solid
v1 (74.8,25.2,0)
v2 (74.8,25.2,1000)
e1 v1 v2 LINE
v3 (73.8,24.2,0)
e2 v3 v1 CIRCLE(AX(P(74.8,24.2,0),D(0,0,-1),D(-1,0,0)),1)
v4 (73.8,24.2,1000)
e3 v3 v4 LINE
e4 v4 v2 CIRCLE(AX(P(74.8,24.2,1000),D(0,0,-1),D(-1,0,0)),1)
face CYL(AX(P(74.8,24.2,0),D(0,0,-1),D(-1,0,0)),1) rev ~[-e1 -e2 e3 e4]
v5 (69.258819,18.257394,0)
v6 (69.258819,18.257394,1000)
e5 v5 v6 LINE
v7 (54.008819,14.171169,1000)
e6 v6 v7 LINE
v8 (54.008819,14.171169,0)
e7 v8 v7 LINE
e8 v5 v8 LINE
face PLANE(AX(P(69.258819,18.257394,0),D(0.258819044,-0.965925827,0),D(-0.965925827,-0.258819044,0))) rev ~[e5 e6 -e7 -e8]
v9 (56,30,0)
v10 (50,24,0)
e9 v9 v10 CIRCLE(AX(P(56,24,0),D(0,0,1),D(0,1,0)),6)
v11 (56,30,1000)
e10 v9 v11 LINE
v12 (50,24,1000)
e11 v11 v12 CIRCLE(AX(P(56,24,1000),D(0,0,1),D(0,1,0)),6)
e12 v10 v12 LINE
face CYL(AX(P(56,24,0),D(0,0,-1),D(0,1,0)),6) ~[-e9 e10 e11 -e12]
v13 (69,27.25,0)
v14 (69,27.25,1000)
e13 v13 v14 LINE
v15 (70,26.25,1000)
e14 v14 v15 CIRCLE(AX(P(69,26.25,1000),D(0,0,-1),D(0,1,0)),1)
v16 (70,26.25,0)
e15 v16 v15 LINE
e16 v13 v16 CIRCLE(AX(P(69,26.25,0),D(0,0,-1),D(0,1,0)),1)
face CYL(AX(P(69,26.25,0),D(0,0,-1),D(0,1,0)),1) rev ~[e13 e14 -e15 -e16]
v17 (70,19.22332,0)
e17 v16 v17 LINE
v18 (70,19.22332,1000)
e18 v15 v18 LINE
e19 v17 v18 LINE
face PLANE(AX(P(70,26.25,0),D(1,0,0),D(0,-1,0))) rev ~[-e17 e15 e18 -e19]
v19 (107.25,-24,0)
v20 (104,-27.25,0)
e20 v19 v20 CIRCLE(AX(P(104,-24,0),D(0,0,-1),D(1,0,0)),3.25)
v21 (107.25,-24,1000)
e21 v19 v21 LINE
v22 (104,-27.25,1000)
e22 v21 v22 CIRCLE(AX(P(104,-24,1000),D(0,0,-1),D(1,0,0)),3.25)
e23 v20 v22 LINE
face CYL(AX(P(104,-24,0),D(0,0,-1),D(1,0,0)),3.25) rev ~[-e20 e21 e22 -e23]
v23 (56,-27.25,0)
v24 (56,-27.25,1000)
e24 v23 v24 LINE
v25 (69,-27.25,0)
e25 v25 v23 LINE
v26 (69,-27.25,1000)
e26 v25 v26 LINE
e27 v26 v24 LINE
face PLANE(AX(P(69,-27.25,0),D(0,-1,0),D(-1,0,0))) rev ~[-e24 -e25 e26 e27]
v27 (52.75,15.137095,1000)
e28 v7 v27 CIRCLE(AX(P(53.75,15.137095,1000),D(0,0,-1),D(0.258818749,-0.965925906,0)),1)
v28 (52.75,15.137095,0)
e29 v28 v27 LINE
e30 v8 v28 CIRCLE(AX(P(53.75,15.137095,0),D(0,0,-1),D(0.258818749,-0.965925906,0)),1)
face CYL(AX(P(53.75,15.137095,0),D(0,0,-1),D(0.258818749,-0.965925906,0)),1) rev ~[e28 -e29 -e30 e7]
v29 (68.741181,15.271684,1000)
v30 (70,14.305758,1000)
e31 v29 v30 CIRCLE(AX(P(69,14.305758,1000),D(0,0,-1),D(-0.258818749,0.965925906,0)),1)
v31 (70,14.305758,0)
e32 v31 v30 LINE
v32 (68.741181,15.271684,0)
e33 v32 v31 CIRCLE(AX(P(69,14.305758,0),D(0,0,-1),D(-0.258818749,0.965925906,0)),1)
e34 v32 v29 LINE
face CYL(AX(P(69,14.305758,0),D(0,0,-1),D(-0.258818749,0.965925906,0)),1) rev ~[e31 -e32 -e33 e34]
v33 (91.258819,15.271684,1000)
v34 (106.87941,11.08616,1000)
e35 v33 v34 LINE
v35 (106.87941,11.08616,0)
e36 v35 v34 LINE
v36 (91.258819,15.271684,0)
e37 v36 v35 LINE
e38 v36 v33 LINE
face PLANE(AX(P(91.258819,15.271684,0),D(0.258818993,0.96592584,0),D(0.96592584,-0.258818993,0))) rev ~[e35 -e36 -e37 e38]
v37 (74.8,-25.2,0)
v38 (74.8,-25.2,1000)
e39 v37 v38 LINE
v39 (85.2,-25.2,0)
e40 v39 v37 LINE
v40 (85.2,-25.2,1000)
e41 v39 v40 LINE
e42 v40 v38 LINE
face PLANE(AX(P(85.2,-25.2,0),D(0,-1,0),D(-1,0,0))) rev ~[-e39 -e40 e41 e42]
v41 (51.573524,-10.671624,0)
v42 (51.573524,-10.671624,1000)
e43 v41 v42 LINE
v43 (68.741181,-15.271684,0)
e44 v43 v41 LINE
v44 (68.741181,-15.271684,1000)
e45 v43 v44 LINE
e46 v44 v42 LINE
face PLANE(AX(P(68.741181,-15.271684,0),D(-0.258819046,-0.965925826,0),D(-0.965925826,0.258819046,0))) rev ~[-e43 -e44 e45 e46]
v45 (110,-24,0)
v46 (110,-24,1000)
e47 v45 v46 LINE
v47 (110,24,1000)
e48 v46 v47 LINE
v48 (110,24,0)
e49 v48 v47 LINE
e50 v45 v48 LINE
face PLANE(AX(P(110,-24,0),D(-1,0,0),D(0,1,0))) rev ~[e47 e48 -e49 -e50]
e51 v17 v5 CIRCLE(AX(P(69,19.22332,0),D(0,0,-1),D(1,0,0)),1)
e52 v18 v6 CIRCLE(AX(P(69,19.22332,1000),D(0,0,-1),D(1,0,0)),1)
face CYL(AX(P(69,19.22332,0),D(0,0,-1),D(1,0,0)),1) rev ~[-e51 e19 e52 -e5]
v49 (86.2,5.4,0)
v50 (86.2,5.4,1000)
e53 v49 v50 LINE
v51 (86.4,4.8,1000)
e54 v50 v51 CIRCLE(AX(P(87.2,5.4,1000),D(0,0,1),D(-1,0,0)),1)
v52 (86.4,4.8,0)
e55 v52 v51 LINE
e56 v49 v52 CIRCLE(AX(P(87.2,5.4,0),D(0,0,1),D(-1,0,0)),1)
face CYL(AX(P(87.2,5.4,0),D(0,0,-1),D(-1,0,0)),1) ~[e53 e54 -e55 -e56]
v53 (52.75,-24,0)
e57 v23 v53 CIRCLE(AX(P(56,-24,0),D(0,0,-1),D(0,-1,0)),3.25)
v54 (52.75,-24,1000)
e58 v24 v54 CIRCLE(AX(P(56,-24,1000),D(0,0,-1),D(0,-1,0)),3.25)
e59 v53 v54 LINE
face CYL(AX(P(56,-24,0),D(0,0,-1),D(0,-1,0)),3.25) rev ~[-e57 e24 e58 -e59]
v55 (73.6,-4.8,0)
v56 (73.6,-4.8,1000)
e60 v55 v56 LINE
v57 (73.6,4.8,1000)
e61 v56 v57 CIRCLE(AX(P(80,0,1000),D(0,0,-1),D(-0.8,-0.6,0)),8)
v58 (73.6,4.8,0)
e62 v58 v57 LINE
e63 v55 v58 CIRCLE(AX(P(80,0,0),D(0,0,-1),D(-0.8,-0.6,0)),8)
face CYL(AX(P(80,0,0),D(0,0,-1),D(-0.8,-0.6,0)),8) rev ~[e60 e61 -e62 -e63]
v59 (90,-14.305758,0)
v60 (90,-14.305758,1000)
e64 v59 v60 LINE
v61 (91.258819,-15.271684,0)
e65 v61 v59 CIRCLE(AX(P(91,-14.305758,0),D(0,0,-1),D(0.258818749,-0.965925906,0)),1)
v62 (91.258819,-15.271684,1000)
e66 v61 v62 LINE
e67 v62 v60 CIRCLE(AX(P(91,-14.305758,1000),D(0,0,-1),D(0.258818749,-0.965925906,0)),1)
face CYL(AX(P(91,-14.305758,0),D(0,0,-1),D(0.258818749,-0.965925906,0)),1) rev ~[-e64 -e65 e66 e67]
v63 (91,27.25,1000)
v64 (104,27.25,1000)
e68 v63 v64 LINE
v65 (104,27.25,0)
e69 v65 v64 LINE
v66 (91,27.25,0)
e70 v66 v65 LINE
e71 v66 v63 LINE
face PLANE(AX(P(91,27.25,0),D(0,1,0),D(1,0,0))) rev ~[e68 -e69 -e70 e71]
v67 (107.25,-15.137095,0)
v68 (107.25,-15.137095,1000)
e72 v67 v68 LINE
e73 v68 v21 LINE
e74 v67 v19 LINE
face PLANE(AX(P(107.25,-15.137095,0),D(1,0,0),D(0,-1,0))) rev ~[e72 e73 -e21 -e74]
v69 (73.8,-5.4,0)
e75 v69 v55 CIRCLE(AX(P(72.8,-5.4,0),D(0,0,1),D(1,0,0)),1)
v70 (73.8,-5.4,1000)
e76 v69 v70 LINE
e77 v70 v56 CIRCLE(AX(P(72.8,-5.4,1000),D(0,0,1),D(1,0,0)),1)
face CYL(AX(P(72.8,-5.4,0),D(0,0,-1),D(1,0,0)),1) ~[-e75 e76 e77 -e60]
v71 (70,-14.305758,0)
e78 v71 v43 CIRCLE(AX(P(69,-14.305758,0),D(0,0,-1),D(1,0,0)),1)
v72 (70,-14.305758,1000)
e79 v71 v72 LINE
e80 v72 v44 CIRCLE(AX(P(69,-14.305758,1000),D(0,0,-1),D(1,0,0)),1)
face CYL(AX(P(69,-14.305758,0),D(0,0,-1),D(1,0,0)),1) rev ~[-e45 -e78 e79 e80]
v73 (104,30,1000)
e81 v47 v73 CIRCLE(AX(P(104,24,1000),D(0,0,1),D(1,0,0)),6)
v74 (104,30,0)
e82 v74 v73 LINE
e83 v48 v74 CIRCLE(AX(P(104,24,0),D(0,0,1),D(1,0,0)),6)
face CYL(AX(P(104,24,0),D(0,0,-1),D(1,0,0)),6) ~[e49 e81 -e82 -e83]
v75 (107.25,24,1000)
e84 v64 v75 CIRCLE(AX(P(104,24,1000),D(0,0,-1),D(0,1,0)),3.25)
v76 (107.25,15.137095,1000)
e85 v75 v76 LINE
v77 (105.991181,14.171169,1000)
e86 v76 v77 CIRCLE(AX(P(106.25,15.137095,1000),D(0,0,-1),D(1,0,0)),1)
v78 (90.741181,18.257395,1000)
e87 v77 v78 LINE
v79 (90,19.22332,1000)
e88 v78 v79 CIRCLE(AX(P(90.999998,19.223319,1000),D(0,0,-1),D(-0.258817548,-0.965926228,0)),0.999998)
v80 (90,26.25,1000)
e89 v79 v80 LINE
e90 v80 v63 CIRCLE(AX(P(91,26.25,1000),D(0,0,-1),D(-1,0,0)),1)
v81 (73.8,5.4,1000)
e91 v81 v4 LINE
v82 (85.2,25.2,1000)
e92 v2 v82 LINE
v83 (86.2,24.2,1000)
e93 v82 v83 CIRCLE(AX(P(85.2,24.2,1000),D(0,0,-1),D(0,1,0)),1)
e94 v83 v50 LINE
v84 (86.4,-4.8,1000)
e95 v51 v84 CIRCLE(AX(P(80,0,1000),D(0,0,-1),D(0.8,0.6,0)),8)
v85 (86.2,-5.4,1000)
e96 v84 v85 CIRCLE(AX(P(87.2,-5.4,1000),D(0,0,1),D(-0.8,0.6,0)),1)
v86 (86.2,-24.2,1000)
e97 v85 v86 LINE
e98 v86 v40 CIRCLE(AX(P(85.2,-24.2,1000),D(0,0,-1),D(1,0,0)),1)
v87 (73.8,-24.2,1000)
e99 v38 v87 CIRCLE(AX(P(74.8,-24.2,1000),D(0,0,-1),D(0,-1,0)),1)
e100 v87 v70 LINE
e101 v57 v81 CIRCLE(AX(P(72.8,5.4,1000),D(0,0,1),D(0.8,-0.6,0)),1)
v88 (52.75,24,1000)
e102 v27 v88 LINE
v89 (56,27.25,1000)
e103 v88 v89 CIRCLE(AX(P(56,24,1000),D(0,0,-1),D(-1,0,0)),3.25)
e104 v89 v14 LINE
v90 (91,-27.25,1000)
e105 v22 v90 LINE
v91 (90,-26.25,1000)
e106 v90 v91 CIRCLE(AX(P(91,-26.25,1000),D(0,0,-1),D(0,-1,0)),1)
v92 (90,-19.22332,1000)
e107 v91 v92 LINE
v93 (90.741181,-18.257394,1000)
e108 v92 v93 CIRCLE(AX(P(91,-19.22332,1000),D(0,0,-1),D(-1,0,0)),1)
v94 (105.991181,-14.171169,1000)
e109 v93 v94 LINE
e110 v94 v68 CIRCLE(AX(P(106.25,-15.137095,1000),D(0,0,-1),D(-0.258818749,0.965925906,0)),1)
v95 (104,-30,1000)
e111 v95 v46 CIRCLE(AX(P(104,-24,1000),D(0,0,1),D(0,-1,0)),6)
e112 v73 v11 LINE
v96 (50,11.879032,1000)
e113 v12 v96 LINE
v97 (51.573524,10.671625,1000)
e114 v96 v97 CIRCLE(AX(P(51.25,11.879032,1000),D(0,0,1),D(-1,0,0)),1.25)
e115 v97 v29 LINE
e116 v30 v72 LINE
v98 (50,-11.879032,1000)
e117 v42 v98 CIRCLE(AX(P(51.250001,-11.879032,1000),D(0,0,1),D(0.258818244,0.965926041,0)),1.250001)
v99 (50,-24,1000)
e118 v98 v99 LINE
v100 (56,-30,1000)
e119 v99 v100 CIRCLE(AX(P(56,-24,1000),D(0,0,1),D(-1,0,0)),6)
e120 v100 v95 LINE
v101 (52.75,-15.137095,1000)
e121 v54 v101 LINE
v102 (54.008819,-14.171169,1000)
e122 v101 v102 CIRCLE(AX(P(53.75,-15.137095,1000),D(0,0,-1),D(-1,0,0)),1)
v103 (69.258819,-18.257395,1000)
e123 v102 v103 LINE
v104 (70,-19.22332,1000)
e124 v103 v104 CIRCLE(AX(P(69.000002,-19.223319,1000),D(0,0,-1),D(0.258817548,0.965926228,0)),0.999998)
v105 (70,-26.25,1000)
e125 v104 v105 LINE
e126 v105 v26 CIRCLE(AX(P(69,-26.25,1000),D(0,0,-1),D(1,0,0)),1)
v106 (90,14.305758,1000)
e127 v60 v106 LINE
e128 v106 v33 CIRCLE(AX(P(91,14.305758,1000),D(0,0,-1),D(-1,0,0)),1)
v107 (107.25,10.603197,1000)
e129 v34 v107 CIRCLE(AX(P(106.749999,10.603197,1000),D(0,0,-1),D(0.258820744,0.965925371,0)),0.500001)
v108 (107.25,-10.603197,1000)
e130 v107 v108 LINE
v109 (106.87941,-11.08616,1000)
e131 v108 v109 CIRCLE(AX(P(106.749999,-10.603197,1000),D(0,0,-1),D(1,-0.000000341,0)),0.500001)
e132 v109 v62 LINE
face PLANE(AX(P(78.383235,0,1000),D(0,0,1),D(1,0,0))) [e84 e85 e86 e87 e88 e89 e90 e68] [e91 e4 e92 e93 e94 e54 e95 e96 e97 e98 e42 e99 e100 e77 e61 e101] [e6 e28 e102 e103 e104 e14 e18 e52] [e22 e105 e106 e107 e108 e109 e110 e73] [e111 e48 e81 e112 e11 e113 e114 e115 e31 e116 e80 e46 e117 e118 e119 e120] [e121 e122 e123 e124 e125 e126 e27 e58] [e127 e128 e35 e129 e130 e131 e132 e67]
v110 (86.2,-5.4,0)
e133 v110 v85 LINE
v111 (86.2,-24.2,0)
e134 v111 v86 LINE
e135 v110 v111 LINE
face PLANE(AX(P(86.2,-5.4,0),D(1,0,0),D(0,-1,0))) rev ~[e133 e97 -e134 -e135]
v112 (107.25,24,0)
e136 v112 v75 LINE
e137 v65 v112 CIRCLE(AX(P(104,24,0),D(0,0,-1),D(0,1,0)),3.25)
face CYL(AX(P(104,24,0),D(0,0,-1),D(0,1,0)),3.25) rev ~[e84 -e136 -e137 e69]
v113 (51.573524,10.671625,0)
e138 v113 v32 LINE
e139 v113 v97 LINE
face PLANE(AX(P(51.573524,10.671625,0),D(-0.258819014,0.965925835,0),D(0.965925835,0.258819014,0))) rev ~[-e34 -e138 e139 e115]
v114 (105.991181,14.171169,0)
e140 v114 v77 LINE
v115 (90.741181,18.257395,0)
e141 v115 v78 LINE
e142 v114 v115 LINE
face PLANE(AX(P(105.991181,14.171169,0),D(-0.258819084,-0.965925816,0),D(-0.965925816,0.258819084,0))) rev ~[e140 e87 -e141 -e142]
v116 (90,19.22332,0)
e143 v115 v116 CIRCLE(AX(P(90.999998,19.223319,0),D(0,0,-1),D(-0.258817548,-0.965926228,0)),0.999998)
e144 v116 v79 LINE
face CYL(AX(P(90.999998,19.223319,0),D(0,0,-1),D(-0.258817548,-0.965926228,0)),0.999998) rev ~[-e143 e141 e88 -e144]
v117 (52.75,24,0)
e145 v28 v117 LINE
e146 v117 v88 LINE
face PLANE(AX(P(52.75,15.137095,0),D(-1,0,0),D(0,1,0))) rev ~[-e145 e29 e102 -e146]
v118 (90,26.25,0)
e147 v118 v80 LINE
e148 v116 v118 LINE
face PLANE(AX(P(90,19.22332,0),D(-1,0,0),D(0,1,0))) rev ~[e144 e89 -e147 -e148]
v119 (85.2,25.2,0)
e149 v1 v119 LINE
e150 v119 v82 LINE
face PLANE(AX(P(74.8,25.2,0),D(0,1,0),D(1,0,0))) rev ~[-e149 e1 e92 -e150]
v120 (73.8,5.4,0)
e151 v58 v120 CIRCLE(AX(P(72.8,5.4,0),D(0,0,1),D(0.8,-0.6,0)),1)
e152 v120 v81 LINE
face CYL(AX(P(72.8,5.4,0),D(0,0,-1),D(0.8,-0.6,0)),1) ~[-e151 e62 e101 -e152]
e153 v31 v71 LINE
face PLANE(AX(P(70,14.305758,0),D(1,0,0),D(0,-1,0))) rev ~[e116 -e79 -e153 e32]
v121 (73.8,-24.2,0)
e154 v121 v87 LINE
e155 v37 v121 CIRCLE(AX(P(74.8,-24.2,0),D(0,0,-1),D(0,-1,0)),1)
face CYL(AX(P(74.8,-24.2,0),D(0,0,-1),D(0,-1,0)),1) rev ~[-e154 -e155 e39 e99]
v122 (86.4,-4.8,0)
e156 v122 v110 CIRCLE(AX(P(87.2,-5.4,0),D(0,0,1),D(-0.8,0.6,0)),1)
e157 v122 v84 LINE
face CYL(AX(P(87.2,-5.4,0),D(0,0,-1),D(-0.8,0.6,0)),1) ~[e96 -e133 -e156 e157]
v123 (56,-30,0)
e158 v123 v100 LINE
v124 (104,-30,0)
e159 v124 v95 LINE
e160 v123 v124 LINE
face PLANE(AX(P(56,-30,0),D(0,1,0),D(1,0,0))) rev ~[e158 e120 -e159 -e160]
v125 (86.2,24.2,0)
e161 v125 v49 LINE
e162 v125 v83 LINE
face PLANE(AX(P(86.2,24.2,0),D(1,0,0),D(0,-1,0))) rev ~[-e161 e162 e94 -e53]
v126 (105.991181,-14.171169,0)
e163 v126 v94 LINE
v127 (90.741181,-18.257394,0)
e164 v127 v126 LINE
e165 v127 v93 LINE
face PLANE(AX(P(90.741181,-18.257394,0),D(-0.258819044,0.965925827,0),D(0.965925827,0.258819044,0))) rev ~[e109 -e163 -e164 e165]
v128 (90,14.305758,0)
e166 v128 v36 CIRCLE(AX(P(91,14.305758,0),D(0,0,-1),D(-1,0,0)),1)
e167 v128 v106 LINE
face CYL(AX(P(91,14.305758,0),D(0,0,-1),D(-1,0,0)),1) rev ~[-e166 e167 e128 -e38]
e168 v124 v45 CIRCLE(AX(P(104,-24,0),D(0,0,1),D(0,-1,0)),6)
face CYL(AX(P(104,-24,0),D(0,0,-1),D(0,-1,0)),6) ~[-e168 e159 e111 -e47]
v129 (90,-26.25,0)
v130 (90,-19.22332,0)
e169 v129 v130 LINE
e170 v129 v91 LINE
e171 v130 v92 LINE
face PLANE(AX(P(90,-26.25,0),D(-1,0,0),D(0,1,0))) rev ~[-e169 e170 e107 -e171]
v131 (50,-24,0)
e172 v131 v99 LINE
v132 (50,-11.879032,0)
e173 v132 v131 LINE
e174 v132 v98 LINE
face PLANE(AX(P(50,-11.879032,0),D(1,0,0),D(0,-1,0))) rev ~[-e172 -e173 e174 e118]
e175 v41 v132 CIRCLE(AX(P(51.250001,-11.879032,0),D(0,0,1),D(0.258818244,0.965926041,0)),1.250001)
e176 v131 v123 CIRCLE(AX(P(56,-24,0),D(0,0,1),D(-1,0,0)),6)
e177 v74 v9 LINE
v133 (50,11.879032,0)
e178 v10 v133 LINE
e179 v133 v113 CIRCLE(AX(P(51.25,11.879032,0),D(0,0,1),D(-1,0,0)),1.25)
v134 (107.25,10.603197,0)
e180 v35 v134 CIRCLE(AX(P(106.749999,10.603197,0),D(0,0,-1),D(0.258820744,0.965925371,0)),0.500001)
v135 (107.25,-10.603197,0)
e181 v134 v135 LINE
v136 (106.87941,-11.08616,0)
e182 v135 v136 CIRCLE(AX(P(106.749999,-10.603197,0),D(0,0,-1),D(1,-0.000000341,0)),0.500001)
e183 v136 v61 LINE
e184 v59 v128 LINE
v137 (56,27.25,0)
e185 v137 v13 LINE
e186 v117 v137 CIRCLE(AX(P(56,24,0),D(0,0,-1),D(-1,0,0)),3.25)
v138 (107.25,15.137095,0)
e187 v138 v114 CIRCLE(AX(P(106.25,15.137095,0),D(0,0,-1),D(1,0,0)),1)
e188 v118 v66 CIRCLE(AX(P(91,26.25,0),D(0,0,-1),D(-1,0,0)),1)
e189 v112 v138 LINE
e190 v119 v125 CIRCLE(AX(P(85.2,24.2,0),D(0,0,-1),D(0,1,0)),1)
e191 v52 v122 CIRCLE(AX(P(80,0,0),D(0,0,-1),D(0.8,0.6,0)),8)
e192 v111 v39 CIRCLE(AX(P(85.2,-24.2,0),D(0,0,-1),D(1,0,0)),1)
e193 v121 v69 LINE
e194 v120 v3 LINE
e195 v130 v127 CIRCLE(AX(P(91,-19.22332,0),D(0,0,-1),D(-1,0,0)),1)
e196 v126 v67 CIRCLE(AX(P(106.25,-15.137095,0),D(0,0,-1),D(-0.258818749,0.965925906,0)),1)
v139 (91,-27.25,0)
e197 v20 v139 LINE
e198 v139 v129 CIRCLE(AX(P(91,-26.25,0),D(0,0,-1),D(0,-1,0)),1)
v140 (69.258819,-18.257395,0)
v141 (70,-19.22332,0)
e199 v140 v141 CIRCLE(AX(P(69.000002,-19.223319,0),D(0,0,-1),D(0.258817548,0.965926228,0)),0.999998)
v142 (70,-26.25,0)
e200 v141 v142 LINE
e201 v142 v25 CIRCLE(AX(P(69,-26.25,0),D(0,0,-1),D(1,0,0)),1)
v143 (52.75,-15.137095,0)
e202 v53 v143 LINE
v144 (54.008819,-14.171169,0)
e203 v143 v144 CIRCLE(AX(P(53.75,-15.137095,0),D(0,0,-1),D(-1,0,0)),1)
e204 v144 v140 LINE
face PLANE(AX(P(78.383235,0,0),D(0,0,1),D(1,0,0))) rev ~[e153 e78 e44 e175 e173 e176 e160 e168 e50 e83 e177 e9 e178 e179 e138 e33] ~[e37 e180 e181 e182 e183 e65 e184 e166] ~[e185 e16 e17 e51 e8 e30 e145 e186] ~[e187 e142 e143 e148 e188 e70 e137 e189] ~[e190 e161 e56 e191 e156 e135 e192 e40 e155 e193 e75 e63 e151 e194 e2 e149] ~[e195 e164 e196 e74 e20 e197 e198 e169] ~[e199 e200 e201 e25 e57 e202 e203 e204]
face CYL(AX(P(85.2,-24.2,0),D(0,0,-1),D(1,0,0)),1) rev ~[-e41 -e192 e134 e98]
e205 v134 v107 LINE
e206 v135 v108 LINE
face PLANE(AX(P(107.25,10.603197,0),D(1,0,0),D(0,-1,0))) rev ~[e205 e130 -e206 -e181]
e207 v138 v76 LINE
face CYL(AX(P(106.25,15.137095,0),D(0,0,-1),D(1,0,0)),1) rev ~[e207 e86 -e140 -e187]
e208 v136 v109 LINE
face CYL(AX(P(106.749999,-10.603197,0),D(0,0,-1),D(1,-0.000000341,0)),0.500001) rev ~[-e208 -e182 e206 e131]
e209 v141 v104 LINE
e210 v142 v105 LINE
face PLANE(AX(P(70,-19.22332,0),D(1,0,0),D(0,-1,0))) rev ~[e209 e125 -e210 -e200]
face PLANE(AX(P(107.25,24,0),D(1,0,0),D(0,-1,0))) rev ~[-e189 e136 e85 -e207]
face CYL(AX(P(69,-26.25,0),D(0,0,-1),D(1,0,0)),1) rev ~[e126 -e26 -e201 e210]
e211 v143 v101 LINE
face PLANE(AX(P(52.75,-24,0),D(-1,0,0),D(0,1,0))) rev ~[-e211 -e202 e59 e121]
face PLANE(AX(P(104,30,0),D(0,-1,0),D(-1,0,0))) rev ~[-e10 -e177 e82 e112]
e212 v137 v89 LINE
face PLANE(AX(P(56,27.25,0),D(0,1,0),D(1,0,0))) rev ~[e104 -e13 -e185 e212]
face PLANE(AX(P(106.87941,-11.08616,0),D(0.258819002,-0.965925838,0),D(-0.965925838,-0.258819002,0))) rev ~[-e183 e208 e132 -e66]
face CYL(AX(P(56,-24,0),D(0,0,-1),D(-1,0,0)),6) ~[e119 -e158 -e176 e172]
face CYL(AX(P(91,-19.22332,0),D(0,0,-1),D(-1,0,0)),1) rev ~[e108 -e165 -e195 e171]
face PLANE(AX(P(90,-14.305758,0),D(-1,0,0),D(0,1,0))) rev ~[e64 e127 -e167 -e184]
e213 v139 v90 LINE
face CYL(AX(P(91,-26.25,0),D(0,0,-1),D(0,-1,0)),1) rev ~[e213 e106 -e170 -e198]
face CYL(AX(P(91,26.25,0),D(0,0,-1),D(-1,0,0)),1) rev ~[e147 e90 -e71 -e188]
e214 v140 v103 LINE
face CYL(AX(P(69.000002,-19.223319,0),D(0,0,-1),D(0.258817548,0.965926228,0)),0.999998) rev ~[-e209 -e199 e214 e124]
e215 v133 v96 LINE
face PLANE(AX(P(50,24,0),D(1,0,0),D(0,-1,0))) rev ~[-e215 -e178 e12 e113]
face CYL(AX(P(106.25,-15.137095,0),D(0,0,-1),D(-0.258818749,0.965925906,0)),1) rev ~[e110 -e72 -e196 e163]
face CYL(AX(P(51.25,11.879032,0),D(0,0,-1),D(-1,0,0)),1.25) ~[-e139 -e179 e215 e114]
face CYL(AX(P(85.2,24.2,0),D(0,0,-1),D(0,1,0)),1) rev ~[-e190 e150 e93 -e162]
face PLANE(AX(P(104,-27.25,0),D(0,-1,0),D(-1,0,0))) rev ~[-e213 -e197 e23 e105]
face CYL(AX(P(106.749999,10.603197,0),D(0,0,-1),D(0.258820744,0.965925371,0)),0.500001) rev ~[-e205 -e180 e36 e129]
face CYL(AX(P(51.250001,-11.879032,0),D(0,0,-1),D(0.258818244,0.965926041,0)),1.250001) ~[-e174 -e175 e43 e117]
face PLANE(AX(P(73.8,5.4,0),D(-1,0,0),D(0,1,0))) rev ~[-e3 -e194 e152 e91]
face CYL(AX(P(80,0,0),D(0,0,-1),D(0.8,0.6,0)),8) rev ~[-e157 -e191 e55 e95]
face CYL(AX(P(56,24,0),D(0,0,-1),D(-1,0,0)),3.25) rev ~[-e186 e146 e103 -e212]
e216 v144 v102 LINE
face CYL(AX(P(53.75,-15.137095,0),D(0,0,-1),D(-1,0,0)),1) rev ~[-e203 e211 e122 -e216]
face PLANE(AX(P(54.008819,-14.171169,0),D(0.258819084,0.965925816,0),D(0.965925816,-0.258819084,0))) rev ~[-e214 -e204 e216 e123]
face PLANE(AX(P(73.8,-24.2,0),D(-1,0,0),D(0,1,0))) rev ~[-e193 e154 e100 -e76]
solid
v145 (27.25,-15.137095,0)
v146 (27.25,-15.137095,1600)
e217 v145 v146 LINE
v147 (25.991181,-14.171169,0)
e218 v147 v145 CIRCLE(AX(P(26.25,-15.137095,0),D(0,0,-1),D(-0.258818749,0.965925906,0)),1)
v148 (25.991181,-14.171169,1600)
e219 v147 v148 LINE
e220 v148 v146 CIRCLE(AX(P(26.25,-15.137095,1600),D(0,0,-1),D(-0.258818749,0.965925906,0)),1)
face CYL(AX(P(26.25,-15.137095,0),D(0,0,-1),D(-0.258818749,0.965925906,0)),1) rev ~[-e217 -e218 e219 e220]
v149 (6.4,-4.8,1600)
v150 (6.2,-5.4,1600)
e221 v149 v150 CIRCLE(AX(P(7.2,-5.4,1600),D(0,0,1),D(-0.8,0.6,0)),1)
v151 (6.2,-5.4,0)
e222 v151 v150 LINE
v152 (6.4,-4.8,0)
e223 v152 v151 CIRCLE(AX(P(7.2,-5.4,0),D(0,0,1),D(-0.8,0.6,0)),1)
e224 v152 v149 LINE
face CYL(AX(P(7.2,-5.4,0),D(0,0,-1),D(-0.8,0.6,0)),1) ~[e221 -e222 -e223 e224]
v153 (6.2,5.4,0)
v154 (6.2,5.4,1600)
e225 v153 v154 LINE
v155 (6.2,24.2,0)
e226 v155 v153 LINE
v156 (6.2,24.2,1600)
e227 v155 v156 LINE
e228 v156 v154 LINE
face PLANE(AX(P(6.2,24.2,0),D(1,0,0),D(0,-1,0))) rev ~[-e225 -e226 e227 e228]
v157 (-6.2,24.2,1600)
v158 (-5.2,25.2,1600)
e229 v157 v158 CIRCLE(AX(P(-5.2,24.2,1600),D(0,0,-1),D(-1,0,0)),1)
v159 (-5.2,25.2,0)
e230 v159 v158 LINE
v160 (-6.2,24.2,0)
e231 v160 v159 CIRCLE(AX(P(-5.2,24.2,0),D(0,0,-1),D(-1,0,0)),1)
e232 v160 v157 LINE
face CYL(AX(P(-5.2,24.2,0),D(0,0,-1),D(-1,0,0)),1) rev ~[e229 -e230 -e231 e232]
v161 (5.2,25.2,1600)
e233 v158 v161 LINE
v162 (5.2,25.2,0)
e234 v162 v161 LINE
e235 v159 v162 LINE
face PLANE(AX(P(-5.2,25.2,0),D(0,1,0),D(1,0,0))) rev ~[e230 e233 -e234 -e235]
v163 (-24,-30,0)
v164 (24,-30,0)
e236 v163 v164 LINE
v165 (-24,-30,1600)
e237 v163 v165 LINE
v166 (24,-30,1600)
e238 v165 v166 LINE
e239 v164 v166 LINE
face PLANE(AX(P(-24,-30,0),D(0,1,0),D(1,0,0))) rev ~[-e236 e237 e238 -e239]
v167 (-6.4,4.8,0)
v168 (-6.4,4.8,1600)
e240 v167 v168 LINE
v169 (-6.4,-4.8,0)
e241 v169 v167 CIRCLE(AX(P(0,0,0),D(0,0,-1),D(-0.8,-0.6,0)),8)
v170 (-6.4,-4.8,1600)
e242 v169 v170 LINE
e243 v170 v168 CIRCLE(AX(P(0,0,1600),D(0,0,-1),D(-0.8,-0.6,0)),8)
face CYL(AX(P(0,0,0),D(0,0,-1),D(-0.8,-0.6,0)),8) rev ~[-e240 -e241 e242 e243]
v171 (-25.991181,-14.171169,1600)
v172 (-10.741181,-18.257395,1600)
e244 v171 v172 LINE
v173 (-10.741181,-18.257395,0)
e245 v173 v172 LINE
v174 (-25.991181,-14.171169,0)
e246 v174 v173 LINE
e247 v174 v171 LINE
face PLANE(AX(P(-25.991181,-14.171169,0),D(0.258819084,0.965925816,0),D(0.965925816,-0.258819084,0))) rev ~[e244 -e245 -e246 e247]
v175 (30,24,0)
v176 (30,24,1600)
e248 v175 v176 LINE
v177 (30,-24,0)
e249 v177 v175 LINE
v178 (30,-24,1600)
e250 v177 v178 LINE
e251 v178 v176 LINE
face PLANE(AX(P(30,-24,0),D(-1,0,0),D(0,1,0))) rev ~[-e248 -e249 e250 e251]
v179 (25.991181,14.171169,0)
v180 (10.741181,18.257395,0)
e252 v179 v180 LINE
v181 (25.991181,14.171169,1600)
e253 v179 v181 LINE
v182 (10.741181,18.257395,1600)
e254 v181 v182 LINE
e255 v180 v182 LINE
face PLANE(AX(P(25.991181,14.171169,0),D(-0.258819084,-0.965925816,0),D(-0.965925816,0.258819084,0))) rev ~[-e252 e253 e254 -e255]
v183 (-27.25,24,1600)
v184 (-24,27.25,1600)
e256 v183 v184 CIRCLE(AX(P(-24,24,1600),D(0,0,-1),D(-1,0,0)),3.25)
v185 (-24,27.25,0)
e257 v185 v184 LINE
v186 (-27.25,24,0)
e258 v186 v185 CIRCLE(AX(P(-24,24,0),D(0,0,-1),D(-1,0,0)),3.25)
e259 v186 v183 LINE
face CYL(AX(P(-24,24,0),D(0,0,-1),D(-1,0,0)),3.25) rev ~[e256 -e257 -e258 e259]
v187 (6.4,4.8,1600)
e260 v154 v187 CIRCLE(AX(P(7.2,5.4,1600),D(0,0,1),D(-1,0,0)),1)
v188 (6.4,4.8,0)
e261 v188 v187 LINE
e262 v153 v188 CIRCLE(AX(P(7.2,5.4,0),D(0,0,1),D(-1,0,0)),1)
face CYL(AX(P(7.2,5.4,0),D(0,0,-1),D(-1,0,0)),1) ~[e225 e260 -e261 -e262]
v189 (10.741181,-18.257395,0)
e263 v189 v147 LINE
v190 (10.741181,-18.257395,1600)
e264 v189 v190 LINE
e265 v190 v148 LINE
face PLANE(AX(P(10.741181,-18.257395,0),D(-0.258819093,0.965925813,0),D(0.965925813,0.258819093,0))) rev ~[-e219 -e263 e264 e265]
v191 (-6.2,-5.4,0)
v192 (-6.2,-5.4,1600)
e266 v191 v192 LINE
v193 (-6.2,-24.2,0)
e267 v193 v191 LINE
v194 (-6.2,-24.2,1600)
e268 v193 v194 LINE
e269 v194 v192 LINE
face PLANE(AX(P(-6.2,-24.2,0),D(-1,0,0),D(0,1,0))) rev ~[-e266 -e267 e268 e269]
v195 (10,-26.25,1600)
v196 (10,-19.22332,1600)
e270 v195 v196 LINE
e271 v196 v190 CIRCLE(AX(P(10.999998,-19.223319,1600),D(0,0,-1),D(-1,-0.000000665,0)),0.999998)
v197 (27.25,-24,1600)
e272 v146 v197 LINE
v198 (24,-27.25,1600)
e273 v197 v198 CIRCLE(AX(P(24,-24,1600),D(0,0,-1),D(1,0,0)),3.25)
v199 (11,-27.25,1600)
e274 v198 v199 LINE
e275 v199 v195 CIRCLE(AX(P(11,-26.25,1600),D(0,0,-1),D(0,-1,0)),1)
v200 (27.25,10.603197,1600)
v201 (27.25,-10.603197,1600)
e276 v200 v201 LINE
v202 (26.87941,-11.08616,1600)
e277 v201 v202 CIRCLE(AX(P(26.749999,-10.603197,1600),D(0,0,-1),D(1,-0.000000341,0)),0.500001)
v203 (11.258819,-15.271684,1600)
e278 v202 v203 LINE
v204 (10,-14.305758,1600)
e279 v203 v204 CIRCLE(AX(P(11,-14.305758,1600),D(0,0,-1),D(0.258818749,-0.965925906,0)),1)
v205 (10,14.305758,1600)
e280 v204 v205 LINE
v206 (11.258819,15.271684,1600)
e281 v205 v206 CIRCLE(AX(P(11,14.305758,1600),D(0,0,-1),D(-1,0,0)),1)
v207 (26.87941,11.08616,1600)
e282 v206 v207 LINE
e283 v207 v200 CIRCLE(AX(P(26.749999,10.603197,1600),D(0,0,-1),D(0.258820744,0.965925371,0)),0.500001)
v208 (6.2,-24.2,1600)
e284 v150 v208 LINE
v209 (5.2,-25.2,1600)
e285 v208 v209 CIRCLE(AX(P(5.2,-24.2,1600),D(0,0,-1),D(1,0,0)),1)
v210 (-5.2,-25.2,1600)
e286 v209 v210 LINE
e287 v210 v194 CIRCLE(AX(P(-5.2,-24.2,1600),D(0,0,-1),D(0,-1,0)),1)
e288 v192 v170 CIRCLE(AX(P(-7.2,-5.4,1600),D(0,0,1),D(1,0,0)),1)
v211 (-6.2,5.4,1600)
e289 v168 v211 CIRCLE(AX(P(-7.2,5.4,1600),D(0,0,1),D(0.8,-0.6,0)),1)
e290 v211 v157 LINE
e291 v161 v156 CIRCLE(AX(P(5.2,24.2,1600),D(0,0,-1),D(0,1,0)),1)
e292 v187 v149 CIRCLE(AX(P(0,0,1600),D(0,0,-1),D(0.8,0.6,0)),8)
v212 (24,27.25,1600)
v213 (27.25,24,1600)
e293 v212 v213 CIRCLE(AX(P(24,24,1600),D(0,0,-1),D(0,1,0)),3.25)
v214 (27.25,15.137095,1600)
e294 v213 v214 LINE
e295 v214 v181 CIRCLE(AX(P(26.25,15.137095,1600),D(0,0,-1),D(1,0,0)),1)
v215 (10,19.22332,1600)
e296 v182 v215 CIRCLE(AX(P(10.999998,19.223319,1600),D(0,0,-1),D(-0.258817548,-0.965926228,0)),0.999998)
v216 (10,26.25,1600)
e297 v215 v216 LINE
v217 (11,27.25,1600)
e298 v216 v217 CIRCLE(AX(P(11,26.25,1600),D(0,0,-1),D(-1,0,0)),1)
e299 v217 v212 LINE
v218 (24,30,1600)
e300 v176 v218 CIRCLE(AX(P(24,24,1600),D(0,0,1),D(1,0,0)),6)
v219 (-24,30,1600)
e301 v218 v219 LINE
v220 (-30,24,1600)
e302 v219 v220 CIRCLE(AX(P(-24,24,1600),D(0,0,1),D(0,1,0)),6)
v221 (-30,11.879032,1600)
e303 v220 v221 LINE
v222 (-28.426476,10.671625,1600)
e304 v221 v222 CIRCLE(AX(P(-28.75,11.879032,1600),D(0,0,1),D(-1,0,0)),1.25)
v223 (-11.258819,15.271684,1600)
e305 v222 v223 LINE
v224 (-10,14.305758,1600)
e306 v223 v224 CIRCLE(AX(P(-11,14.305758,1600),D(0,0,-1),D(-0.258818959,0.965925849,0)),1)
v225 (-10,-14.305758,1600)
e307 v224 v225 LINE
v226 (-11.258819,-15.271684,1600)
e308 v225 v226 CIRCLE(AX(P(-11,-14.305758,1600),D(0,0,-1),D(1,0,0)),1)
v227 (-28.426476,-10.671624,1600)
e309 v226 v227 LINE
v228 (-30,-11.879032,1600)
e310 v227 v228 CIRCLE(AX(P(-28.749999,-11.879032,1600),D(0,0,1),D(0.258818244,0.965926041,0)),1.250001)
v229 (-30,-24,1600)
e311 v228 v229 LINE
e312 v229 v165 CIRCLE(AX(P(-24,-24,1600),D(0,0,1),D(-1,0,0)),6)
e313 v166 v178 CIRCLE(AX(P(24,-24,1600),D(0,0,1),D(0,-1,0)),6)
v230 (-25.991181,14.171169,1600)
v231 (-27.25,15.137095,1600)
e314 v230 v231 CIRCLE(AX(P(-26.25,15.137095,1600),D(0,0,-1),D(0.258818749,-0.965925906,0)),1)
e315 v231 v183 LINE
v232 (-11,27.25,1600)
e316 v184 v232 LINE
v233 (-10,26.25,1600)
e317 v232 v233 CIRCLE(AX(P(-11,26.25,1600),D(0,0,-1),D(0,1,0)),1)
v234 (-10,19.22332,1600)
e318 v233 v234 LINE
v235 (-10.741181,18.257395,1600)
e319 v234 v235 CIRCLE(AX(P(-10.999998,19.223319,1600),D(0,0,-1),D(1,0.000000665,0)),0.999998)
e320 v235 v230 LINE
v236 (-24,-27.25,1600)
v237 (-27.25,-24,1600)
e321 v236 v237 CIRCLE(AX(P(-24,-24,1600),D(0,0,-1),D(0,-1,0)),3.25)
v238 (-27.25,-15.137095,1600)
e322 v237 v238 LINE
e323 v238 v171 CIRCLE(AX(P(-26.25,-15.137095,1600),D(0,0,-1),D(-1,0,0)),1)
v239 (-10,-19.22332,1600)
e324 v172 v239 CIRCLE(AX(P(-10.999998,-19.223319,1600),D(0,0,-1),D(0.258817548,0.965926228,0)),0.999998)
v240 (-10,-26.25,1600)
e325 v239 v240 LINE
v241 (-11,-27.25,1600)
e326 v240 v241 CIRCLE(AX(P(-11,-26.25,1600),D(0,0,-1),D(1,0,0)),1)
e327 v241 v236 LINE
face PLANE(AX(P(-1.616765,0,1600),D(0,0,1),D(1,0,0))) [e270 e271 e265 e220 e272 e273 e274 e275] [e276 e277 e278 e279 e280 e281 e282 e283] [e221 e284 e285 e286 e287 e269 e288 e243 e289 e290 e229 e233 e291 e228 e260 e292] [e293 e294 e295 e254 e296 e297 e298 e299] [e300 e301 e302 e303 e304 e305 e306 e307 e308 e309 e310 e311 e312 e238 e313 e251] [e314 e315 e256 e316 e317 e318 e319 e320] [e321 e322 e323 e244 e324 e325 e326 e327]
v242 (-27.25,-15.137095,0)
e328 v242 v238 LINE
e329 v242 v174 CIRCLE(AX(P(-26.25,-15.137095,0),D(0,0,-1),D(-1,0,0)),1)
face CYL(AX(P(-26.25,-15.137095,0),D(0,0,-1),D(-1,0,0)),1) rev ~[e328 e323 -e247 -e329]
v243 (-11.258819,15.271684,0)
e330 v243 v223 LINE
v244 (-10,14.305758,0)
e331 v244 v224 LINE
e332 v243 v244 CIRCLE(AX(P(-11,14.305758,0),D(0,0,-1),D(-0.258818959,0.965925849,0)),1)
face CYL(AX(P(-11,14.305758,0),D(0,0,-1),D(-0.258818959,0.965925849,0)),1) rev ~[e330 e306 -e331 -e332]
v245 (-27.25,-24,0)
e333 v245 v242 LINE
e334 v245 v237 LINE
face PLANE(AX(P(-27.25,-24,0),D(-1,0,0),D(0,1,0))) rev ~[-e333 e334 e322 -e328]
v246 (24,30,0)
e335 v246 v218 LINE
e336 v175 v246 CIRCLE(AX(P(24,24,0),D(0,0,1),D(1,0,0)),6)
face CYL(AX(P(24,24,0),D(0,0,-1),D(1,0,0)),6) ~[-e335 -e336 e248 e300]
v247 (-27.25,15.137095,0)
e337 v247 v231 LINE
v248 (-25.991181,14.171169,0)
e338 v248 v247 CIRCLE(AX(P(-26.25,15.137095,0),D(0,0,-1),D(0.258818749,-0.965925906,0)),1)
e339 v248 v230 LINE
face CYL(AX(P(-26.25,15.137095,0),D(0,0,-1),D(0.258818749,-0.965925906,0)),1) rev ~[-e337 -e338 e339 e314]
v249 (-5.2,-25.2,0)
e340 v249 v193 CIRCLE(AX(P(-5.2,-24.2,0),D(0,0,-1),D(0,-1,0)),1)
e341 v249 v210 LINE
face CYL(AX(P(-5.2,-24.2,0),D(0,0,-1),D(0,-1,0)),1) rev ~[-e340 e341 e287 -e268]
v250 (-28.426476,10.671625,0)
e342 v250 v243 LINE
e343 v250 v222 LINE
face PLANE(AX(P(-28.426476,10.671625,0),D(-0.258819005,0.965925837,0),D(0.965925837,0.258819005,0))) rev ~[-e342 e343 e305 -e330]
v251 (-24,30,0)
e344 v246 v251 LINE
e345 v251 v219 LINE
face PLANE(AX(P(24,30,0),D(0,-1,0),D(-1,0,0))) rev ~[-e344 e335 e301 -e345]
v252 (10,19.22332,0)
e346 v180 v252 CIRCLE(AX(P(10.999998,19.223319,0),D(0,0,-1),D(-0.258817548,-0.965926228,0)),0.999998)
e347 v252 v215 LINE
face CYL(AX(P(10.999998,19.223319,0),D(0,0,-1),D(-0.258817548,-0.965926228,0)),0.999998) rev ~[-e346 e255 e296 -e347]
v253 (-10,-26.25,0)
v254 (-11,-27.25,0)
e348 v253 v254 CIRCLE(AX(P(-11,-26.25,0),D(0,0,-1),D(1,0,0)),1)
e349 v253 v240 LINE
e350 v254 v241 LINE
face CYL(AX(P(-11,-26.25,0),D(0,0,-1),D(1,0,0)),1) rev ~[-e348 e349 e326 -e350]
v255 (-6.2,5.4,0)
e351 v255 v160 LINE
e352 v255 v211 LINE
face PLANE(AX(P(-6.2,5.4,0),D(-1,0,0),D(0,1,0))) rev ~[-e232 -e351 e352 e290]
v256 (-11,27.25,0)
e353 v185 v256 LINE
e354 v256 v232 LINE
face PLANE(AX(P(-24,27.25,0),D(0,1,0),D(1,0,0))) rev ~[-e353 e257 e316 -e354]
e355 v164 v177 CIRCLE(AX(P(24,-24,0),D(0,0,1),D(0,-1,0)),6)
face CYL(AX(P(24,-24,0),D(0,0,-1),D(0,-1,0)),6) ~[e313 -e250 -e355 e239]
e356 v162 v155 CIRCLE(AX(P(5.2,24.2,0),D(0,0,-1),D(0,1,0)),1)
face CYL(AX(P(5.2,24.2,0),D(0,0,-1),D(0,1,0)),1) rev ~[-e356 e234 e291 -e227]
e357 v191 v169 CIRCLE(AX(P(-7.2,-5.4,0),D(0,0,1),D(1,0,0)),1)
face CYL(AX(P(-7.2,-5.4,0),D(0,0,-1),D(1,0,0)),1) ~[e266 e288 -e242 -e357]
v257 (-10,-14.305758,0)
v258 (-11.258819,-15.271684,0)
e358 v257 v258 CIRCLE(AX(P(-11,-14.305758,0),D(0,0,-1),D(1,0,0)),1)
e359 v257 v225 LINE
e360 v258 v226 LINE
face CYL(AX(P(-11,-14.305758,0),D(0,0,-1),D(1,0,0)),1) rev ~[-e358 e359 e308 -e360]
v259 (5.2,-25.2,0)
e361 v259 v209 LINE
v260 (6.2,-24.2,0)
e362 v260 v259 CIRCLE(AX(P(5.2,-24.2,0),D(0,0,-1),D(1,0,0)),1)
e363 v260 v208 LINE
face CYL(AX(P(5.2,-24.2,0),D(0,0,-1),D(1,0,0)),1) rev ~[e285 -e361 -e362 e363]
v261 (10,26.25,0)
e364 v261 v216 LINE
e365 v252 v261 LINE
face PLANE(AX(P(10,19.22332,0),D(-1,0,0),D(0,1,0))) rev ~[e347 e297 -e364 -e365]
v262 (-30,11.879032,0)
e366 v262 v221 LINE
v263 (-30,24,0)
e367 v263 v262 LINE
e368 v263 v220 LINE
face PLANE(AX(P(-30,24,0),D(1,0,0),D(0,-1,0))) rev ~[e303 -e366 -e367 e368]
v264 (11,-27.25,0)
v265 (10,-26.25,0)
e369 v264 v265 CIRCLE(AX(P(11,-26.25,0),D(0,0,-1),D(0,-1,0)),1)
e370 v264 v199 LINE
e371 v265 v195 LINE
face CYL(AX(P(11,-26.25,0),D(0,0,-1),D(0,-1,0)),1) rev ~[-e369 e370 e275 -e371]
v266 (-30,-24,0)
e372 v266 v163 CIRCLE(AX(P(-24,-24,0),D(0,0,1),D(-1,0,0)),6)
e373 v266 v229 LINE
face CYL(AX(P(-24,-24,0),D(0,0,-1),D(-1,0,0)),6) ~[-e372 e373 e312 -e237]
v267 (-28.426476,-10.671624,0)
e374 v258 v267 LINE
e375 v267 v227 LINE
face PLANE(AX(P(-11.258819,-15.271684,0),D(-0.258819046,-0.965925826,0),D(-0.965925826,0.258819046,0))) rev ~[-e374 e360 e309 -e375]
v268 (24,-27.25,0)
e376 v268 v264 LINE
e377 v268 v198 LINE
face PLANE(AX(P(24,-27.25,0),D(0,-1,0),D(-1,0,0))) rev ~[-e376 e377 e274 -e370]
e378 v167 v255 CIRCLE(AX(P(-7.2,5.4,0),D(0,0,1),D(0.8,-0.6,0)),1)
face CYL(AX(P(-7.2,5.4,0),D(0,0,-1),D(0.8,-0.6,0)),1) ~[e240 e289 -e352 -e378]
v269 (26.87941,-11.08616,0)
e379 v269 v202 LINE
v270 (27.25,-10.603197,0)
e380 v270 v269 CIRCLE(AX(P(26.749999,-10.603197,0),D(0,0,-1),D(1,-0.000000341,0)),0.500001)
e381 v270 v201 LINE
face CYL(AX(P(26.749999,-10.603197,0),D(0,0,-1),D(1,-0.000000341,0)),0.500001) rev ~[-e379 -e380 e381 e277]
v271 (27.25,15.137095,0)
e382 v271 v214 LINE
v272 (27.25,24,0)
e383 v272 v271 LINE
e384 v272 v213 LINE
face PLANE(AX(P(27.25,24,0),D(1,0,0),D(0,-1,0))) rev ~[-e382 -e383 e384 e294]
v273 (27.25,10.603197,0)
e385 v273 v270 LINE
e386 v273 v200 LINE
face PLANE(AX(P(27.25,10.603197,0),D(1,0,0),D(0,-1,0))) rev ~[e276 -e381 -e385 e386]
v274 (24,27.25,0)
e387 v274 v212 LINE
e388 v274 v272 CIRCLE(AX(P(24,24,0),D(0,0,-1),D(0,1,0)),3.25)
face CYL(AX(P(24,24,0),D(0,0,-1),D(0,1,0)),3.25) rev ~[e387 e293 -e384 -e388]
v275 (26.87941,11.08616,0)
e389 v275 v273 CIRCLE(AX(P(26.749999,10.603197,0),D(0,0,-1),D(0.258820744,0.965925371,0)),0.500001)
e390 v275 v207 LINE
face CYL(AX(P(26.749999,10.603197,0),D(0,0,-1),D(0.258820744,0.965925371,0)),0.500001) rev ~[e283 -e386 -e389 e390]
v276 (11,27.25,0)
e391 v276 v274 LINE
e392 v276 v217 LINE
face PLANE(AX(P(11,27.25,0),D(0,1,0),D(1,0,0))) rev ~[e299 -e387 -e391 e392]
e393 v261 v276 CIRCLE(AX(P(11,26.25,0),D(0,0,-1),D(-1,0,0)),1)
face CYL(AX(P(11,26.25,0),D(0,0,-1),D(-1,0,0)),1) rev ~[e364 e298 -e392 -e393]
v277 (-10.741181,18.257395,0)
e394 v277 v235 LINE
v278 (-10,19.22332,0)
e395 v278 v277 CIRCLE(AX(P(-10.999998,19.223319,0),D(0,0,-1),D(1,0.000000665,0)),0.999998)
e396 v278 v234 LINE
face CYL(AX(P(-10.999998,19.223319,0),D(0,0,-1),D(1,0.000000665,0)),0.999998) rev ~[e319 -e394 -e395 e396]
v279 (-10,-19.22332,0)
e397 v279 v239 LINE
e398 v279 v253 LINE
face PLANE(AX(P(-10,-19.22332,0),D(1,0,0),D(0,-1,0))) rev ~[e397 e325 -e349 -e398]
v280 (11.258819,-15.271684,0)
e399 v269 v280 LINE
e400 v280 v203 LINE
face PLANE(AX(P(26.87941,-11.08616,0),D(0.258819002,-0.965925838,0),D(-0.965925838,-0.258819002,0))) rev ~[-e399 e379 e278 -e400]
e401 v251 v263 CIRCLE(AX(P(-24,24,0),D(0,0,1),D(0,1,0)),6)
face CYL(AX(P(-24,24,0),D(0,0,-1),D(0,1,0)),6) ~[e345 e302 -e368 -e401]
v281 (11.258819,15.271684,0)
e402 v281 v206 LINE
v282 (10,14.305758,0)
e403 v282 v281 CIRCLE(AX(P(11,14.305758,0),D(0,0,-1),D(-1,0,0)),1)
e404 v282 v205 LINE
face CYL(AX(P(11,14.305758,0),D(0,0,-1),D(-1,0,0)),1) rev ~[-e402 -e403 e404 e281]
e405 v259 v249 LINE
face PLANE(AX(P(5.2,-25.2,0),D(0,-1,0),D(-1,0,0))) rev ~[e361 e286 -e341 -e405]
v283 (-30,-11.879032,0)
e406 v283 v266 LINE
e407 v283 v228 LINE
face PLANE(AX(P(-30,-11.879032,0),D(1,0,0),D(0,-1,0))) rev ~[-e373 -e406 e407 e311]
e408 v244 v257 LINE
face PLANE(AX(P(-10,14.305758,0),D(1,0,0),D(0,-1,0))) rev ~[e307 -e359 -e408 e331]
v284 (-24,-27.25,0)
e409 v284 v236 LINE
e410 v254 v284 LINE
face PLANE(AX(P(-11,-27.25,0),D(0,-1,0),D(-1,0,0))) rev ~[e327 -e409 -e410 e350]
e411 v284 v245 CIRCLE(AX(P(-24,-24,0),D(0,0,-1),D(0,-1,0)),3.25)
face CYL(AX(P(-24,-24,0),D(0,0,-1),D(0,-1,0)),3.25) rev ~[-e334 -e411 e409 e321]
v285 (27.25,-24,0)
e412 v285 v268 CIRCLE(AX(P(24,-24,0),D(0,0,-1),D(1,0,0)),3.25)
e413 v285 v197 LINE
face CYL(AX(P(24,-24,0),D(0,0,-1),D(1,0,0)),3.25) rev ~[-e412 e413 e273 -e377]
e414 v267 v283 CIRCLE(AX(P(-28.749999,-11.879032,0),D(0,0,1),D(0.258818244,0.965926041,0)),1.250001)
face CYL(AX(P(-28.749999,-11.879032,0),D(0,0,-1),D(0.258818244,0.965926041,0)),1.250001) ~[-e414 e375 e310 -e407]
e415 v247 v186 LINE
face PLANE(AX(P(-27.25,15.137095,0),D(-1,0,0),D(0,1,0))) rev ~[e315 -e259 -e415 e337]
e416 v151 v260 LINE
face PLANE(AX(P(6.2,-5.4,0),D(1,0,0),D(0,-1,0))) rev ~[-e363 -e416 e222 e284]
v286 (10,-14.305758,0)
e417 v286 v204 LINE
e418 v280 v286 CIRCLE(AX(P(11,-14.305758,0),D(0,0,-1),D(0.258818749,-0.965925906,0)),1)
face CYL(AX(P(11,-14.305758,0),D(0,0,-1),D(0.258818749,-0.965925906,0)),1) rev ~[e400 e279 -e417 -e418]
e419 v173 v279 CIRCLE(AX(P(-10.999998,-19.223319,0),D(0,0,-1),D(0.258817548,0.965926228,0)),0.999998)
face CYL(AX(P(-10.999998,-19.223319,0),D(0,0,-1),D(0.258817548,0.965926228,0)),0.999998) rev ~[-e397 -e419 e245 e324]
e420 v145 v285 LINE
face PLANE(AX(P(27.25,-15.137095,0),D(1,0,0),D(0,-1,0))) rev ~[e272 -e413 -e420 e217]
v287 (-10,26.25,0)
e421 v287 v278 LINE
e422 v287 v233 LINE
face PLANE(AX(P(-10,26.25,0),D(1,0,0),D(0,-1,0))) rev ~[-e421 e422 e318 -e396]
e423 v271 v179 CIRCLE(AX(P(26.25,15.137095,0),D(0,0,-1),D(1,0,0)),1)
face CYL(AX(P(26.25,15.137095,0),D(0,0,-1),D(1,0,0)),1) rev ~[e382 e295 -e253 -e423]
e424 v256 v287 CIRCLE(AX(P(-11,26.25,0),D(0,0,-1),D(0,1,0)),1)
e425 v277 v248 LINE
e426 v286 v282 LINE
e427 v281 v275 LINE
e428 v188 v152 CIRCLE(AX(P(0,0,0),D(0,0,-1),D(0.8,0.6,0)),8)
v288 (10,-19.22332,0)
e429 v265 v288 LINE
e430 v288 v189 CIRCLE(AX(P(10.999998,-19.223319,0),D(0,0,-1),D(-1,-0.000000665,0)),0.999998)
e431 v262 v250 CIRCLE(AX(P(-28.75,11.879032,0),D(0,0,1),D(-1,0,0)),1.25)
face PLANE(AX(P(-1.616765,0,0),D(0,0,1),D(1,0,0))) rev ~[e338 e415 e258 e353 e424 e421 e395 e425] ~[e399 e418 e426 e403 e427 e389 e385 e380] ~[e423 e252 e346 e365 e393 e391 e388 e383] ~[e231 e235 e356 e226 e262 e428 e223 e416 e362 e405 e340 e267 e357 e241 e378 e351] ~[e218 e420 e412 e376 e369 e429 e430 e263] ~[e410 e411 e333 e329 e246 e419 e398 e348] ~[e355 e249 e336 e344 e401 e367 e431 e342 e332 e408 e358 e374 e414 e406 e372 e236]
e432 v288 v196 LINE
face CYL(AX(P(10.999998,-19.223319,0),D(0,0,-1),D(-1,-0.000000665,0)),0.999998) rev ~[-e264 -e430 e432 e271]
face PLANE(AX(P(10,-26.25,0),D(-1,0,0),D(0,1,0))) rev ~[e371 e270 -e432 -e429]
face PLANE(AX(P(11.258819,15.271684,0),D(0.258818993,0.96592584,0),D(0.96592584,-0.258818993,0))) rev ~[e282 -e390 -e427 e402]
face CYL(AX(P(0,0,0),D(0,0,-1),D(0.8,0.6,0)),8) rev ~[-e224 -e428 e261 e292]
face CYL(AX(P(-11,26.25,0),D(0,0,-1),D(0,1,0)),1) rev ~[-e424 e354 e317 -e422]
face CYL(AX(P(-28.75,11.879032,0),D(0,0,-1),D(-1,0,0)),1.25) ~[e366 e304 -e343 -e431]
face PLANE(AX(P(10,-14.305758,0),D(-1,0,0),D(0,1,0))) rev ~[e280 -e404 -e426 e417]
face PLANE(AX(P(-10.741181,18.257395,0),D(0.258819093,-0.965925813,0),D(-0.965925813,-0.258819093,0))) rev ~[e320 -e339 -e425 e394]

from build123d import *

# Parameters (mm, degrees)
F1_DEPTH = 1600
F2_DEPTH = 1000


# Not quite as in the source:
# - ends of sketch curves that miss each other by under 0.0002 mm in the source are joined


with BuildPart() as f1:
    # F0 (on Top) → F1 (new body)
    with BuildSketch(Plane.XY):
        with BuildLine():
            ThreePointArc((-11.2588189596, 15.2716838492), (-10.3912385359, 15.0991113133), (-10, 14.305758))
            Line((-10, 14.305758), (-10, -14.305758))
            ThreePointArc((-10, -14.305758), (-10.3912385359, -15.0991113133), (-11.2588189596, -15.2716838492))
            Line((-11.2588189596, -15.2716838492), (-28.426476, -10.671624))
            ThreePointArc((-28.426476, -10.671624), (-29.5109517857, -10.8873403242), (-30, -11.879032))
            Line((-30, -11.879032), (-30, -24))
            ThreePointArc((-30, -24), (-28.2426406871, -28.2426406871), (-24, -30))
            Line((-24, -30), (24, -30))
            ThreePointArc((24, -30), (28.2426406871, -28.2426406871), (30, -24))
            Line((30, -24), (30, 24))
            ThreePointArc((30, 24), (28.2426406871, 28.2426406871), (24, 30))
            Line((24, 30), (-24, 30))
            ThreePointArc((-24, 30), (-28.2426406871, 28.2426406871), (-30, 24))
            Line((-30, 24), (-30, 11.879032))
            ThreePointArc((-30, 11.879032), (-29.5109517857, 10.8873403242), (-28.4264761923, 10.6716247175))
            Line((-28.4264761923, 10.6716247175), (-11.2588189596, 15.2716838492))
        make_face()
        with BuildLine():
            Line((-11, -27.25), (-24, -27.25))
            ThreePointArc((-24, -27.25), (-26.2980970389, -26.2980970389), (-27.25, -24))
            Line((-27.25, -24), (-27.25, -15.137095))
            ThreePointArc((-27.25, -15.137095), (-26.8587614641, -14.3437416867), (-25.9911810404, -14.1711691508))
            Line((-25.9911810404, -14.1711691508), (-10.741181, -18.257395))
            ThreePointArc((-10.741181, -18.257395), (-10.2066466079, -18.6145586385), (-10, -19.22332))
            Line((-10, -19.22332), (-10, -26.25))
            ThreePointArc((-10, -26.25), (-10.2928932188, -26.9571067812), (-11, -27.25))
        make_face(mode=Mode.SUBTRACT)
        with BuildLine():
            Line((10.741181, -18.257395), (25.991181, -14.171169))
            ThreePointArc((25.991181, -14.171169), (26.8587614641, -14.3437416867), (27.25, -15.137095))
            Line((27.25, -15.137095), (27.25, -24))
            ThreePointArc((27.25, -24), (26.2980970389, -26.2980970389), (24, -27.25))
            Line((24, -27.25), (11, -27.25))
            ThreePointArc((11, -27.25), (10.2928932188, -26.9571067812), (10, -26.25))
            Line((10, -26.25), (10, -19.22332))
            ThreePointArc((10, -19.22332), (10.2066466079, -18.6145586385), (10.741181, -18.257395))
        make_face(mode=Mode.SUBTRACT)
        with BuildLine():
            Line((-5.2, 25.2), (5.2, 25.2))
            ThreePointArc((5.2, 25.2), (5.9071067812, 24.9071067812), (6.2, 24.2))
            Line((6.2, 24.2), (6.2, 5.4))
            ThreePointArc((6.2, 5.4), (6.2513167019, 5.083772234), (6.4, 4.8))
            ThreePointArc((6.4, 4.8), (8, 0), (6.4, -4.8))
            ThreePointArc((6.4, -4.8), (6.2513167019, -5.083772234), (6.2, -5.4))
            Line((6.2, -5.4), (6.2, -24.2))
            ThreePointArc((6.2, -24.2), (5.9071067812, -24.9071067812), (5.2, -25.2))
            Line((5.2, -25.2), (-5.2, -25.2))
            ThreePointArc((-5.2, -25.2), (-5.9071067812, -24.9071067812), (-6.2, -24.2))
            Line((-6.2, -24.2), (-6.2, -5.4))
            ThreePointArc((-6.2, -5.4), (-6.2513167019, -5.083772234), (-6.4, -4.8))
            ThreePointArc((-6.4, -4.8), (-8, 0), (-6.4, 4.8))
            ThreePointArc((-6.4, 4.8), (-6.2513167019, 5.083772234), (-6.2, 5.4))
            Line((-6.2, 5.4), (-6.2, 24.2))
            ThreePointArc((-6.2, 24.2), (-5.9071067812, 24.9071067812), (-5.2, 25.2))
        make_face(mode=Mode.SUBTRACT)
        with BuildLine():
            Line((26.87941, -11.08616), (11.258819, -15.271684))
            ThreePointArc((11.258819, -15.271684), (10.3912385359, -15.0991113133), (10, -14.305758))
            Line((10, -14.305758), (10, 14.305758))
            ThreePointArc((10, 14.305758), (10.3912385359, 15.0991113133), (11.2588189596, 15.2716838492))
            Line((11.2588189596, 15.2716838492), (26.87941, 11.08616))
            ThreePointArc((26.87941, 11.08616), (27.1466768037, 10.9075775405), (27.25, 10.603197))
            Line((27.25, 10.603197), (27.25, -10.603197))
            ThreePointArc((27.25, -10.603197), (27.1466768037, -10.9075775405), (26.87941, -11.08616))
        make_face(mode=Mode.SUBTRACT)
        with BuildLine():
            Line((-10.741181, 18.257395), (-25.991181, 14.171169))
            ThreePointArc((-25.991181, 14.171169), (-26.8587614641, 14.3437416867), (-27.25, 15.137095))
            Line((-27.25, 15.137095), (-27.25, 24))
            ThreePointArc((-27.25, 24), (-26.2980970389, 26.2980970389), (-24, 27.25))
            Line((-24, 27.25), (-11, 27.25))
            ThreePointArc((-11, 27.25), (-10.2928932188, 26.9571067812), (-10, 26.25))
            Line((-10, 26.25), (-10, 19.22332))
            ThreePointArc((-10, 19.22332), (-10.2066466079, 18.6145586385), (-10.741181, 18.257395))
        make_face(mode=Mode.SUBTRACT)
        with BuildLine():
            Line((11, 27.25), (24, 27.25))
            ThreePointArc((24, 27.25), (26.2980970389, 26.2980970389), (27.25, 24))
            Line((27.25, 24), (27.25, 15.137095))
            ThreePointArc((27.25, 15.137095), (26.8587614641, 14.3437416867), (25.9911810404, 14.1711691508))
            Line((25.9911810404, 14.1711691508), (10.741181, 18.257395))
            ThreePointArc((10.741181, 18.257395), (10.2066466079, 18.6145586385), (10, 19.22332))
            Line((10, 19.22332), (10, 26.25))
            ThreePointArc((10, 26.25), (10.2928932188, 26.9571067812), (11, 27.25))
        make_face(mode=Mode.SUBTRACT)
    extrude(amount=F1_DEPTH)


with BuildPart() as f2:
    # F0 (on Top) → F2 (new body)
    with BuildSketch(Plane.XY):
        with BuildLine():
            Line((50, -11.879032), (50, -24))
            ThreePointArc((50, -24), (51.7573593129, -28.2426406871), (56, -30))
            Line((56, -30), (104, -30))
            ThreePointArc((104, -30), (108.2426406871, -28.2426406871), (110, -24))
            Line((110, -24), (110, 24))
            ThreePointArc((110, 24), (108.2426406871, 28.2426406871), (104, 30))
            Line((104, 30), (56, 30))
            ThreePointArc((56, 30), (51.7573593129, 28.2426406871), (50, 24))
            Line((50, 24), (50, 11.879032))
            ThreePointArc((50, 11.879032), (50.4890482143, 10.8873403242), (51.5735238077, 10.6716247175))
            Line((51.5735238077, 10.6716247175), (68.741181, 15.271684))
            ThreePointArc((68.741181, 15.271684), (69.6087614641, 15.0991113133), (70, 14.305758))
            Line((70, 14.305758), (70, -14.305758))
            ThreePointArc((70, -14.305758), (69.6087614641, -15.0991113133), (68.7411810404, -15.2716838492))
            Line((68.7411810404, -15.2716838492), (51.573524, -10.671624))
            ThreePointArc((51.573524, -10.671624), (50.4890482143, -10.8873403242), (50, -11.879032))
        make_face()
        with BuildLine():
            Line((52.75, -24), (52.75, -15.137095))
            ThreePointArc((52.75, -15.137095), (53.1412385359, -14.3437416867), (54.0088189596, -14.1711691508))
            Line((54.0088189596, -14.1711691508), (69.258819, -18.257395))
            ThreePointArc((69.258819, -18.257395), (69.7933533921, -18.6145586385), (70, -19.22332))
            Line((70, -19.22332), (70, -26.25))
            ThreePointArc((70, -26.25), (69.7071067812, -26.9571067812), (69, -27.25))
            Line((69, -27.25), (56, -27.25))
            ThreePointArc((56, -27.25), (53.7019029611, -26.2980970389), (52.75, -24))
        make_face(mode=Mode.SUBTRACT)
        with BuildLine():
            ThreePointArc((107.25, -24), (106.2980970389, -26.2980970389), (104, -27.25))
            Line((104, -27.25), (91, -27.25))
            ThreePointArc((91, -27.25), (90.2928932188, -26.9571067812), (90, -26.25))
            Line((90, -26.25), (90, -19.22332))
            ThreePointArc((90, -19.22332), (90.2066466079, -18.6145586385), (90.7411807904, -18.2573942178))
            Line((90.7411807904, -18.2573942178), (105.991181, -14.171169))
            ThreePointArc((105.991181, -14.171169), (106.8587614641, -14.3437416867), (107.25, -15.137095))
            Line((107.25, -15.137095), (107.25, -24))
        make_face(mode=Mode.SUBTRACT)
        with BuildLine():
            Line((73.8, 5.4), (73.8, 24.2))
            ThreePointArc((73.8, 24.2), (74.0928932188, 24.9071067812), (74.8, 25.2))
            Line((74.8, 25.2), (85.2, 25.2))
            ThreePointArc((85.2, 25.2), (85.9071067812, 24.9071067812), (86.2, 24.2))
            Line((86.2, 24.2), (86.2, 5.4))
            ThreePointArc((86.2, 5.4), (86.2513167019, 5.083772234), (86.4, 4.8))
            ThreePointArc((86.4, 4.8), (88, 0), (86.4, -4.8))
            ThreePointArc((86.4, -4.8), (86.2513167019, -5.083772234), (86.2, -5.4))
            Line((86.2, -5.4), (86.2, -24.2))
            ThreePointArc((86.2, -24.2), (85.9071067812, -24.9071067812), (85.2, -25.2))
            Line((85.2, -25.2), (74.8, -25.2))
            ThreePointArc((74.8, -25.2), (74.0928932188, -24.9071067812), (73.8, -24.2))
            Line((73.8, -24.2), (73.8, -5.4))
            ThreePointArc((73.8, -5.4), (73.7486832981, -5.083772234), (73.6, -4.8))
            ThreePointArc((73.6, -4.8), (72, 0), (73.6, 4.8))
            ThreePointArc((73.6, 4.8), (73.7486832981, 5.083772234), (73.8, 5.4))
        make_face(mode=Mode.SUBTRACT)
        with BuildLine():
            Line((106.87941, -11.08616), (91.258819, -15.271684))
            ThreePointArc((91.258819, -15.271684), (90.3912385359, -15.0991113133), (90, -14.305758))
            Line((90, -14.305758), (90, 14.305758))
            ThreePointArc((90, 14.305758), (90.3912385359, 15.0991113133), (91.2588189596, 15.2716838492))
            Line((91.2588189596, 15.2716838492), (106.87941, 11.08616))
            ThreePointArc((106.87941, 11.08616), (107.1466768037, 10.9075775405), (107.25, 10.603197))
            Line((107.25, 10.603197), (107.25, -10.603197))
            ThreePointArc((107.25, -10.603197), (107.1466768037, -10.9075775405), (106.87941, -11.08616))
        make_face(mode=Mode.SUBTRACT)
        with BuildLine():
            ThreePointArc((52.75, 24), (53.7019029611, 26.2980970389), (56, 27.25))
            Line((56, 27.25), (69, 27.25))
            ThreePointArc((69, 27.25), (69.7071067812, 26.9571067812), (70, 26.25))
            Line((70, 26.25), (70, 19.22332))
            ThreePointArc((70, 19.22332), (69.7933533921, 18.6145586385), (69.2588192096, 18.2573942178))
            Line((69.2588192096, 18.2573942178), (54.008819, 14.171169))
            ThreePointArc((54.008819, 14.171169), (53.1412385359, 14.3437416867), (52.75, 15.137095))
            Line((52.75, 15.137095), (52.75, 24))
        make_face(mode=Mode.SUBTRACT)
        with BuildLine():
            ThreePointArc((104, 27.25), (106.2980970389, 26.2980970389), (107.25, 24))
            Line((107.25, 24), (107.25, 15.137095))
            ThreePointArc((107.25, 15.137095), (106.8587614641, 14.3437416867), (105.9911810404, 14.1711691508))
            Line((105.9911810404, 14.1711691508), (90.741181, 18.257395))
            ThreePointArc((90.741181, 18.257395), (90.2066466079, 18.6145586385), (90, 19.22332))
            Line((90, 19.22332), (90, 26.25))
            ThreePointArc((90, 26.25), (90.2928932188, 26.9571067812), (91, 27.25))
            Line((91, 27.25), (104, 27.25))
        make_face(mode=Mode.SUBTRACT)
    extrude(amount=F2_DEPTH)


solid = Compound([f1.part, f2.part])
